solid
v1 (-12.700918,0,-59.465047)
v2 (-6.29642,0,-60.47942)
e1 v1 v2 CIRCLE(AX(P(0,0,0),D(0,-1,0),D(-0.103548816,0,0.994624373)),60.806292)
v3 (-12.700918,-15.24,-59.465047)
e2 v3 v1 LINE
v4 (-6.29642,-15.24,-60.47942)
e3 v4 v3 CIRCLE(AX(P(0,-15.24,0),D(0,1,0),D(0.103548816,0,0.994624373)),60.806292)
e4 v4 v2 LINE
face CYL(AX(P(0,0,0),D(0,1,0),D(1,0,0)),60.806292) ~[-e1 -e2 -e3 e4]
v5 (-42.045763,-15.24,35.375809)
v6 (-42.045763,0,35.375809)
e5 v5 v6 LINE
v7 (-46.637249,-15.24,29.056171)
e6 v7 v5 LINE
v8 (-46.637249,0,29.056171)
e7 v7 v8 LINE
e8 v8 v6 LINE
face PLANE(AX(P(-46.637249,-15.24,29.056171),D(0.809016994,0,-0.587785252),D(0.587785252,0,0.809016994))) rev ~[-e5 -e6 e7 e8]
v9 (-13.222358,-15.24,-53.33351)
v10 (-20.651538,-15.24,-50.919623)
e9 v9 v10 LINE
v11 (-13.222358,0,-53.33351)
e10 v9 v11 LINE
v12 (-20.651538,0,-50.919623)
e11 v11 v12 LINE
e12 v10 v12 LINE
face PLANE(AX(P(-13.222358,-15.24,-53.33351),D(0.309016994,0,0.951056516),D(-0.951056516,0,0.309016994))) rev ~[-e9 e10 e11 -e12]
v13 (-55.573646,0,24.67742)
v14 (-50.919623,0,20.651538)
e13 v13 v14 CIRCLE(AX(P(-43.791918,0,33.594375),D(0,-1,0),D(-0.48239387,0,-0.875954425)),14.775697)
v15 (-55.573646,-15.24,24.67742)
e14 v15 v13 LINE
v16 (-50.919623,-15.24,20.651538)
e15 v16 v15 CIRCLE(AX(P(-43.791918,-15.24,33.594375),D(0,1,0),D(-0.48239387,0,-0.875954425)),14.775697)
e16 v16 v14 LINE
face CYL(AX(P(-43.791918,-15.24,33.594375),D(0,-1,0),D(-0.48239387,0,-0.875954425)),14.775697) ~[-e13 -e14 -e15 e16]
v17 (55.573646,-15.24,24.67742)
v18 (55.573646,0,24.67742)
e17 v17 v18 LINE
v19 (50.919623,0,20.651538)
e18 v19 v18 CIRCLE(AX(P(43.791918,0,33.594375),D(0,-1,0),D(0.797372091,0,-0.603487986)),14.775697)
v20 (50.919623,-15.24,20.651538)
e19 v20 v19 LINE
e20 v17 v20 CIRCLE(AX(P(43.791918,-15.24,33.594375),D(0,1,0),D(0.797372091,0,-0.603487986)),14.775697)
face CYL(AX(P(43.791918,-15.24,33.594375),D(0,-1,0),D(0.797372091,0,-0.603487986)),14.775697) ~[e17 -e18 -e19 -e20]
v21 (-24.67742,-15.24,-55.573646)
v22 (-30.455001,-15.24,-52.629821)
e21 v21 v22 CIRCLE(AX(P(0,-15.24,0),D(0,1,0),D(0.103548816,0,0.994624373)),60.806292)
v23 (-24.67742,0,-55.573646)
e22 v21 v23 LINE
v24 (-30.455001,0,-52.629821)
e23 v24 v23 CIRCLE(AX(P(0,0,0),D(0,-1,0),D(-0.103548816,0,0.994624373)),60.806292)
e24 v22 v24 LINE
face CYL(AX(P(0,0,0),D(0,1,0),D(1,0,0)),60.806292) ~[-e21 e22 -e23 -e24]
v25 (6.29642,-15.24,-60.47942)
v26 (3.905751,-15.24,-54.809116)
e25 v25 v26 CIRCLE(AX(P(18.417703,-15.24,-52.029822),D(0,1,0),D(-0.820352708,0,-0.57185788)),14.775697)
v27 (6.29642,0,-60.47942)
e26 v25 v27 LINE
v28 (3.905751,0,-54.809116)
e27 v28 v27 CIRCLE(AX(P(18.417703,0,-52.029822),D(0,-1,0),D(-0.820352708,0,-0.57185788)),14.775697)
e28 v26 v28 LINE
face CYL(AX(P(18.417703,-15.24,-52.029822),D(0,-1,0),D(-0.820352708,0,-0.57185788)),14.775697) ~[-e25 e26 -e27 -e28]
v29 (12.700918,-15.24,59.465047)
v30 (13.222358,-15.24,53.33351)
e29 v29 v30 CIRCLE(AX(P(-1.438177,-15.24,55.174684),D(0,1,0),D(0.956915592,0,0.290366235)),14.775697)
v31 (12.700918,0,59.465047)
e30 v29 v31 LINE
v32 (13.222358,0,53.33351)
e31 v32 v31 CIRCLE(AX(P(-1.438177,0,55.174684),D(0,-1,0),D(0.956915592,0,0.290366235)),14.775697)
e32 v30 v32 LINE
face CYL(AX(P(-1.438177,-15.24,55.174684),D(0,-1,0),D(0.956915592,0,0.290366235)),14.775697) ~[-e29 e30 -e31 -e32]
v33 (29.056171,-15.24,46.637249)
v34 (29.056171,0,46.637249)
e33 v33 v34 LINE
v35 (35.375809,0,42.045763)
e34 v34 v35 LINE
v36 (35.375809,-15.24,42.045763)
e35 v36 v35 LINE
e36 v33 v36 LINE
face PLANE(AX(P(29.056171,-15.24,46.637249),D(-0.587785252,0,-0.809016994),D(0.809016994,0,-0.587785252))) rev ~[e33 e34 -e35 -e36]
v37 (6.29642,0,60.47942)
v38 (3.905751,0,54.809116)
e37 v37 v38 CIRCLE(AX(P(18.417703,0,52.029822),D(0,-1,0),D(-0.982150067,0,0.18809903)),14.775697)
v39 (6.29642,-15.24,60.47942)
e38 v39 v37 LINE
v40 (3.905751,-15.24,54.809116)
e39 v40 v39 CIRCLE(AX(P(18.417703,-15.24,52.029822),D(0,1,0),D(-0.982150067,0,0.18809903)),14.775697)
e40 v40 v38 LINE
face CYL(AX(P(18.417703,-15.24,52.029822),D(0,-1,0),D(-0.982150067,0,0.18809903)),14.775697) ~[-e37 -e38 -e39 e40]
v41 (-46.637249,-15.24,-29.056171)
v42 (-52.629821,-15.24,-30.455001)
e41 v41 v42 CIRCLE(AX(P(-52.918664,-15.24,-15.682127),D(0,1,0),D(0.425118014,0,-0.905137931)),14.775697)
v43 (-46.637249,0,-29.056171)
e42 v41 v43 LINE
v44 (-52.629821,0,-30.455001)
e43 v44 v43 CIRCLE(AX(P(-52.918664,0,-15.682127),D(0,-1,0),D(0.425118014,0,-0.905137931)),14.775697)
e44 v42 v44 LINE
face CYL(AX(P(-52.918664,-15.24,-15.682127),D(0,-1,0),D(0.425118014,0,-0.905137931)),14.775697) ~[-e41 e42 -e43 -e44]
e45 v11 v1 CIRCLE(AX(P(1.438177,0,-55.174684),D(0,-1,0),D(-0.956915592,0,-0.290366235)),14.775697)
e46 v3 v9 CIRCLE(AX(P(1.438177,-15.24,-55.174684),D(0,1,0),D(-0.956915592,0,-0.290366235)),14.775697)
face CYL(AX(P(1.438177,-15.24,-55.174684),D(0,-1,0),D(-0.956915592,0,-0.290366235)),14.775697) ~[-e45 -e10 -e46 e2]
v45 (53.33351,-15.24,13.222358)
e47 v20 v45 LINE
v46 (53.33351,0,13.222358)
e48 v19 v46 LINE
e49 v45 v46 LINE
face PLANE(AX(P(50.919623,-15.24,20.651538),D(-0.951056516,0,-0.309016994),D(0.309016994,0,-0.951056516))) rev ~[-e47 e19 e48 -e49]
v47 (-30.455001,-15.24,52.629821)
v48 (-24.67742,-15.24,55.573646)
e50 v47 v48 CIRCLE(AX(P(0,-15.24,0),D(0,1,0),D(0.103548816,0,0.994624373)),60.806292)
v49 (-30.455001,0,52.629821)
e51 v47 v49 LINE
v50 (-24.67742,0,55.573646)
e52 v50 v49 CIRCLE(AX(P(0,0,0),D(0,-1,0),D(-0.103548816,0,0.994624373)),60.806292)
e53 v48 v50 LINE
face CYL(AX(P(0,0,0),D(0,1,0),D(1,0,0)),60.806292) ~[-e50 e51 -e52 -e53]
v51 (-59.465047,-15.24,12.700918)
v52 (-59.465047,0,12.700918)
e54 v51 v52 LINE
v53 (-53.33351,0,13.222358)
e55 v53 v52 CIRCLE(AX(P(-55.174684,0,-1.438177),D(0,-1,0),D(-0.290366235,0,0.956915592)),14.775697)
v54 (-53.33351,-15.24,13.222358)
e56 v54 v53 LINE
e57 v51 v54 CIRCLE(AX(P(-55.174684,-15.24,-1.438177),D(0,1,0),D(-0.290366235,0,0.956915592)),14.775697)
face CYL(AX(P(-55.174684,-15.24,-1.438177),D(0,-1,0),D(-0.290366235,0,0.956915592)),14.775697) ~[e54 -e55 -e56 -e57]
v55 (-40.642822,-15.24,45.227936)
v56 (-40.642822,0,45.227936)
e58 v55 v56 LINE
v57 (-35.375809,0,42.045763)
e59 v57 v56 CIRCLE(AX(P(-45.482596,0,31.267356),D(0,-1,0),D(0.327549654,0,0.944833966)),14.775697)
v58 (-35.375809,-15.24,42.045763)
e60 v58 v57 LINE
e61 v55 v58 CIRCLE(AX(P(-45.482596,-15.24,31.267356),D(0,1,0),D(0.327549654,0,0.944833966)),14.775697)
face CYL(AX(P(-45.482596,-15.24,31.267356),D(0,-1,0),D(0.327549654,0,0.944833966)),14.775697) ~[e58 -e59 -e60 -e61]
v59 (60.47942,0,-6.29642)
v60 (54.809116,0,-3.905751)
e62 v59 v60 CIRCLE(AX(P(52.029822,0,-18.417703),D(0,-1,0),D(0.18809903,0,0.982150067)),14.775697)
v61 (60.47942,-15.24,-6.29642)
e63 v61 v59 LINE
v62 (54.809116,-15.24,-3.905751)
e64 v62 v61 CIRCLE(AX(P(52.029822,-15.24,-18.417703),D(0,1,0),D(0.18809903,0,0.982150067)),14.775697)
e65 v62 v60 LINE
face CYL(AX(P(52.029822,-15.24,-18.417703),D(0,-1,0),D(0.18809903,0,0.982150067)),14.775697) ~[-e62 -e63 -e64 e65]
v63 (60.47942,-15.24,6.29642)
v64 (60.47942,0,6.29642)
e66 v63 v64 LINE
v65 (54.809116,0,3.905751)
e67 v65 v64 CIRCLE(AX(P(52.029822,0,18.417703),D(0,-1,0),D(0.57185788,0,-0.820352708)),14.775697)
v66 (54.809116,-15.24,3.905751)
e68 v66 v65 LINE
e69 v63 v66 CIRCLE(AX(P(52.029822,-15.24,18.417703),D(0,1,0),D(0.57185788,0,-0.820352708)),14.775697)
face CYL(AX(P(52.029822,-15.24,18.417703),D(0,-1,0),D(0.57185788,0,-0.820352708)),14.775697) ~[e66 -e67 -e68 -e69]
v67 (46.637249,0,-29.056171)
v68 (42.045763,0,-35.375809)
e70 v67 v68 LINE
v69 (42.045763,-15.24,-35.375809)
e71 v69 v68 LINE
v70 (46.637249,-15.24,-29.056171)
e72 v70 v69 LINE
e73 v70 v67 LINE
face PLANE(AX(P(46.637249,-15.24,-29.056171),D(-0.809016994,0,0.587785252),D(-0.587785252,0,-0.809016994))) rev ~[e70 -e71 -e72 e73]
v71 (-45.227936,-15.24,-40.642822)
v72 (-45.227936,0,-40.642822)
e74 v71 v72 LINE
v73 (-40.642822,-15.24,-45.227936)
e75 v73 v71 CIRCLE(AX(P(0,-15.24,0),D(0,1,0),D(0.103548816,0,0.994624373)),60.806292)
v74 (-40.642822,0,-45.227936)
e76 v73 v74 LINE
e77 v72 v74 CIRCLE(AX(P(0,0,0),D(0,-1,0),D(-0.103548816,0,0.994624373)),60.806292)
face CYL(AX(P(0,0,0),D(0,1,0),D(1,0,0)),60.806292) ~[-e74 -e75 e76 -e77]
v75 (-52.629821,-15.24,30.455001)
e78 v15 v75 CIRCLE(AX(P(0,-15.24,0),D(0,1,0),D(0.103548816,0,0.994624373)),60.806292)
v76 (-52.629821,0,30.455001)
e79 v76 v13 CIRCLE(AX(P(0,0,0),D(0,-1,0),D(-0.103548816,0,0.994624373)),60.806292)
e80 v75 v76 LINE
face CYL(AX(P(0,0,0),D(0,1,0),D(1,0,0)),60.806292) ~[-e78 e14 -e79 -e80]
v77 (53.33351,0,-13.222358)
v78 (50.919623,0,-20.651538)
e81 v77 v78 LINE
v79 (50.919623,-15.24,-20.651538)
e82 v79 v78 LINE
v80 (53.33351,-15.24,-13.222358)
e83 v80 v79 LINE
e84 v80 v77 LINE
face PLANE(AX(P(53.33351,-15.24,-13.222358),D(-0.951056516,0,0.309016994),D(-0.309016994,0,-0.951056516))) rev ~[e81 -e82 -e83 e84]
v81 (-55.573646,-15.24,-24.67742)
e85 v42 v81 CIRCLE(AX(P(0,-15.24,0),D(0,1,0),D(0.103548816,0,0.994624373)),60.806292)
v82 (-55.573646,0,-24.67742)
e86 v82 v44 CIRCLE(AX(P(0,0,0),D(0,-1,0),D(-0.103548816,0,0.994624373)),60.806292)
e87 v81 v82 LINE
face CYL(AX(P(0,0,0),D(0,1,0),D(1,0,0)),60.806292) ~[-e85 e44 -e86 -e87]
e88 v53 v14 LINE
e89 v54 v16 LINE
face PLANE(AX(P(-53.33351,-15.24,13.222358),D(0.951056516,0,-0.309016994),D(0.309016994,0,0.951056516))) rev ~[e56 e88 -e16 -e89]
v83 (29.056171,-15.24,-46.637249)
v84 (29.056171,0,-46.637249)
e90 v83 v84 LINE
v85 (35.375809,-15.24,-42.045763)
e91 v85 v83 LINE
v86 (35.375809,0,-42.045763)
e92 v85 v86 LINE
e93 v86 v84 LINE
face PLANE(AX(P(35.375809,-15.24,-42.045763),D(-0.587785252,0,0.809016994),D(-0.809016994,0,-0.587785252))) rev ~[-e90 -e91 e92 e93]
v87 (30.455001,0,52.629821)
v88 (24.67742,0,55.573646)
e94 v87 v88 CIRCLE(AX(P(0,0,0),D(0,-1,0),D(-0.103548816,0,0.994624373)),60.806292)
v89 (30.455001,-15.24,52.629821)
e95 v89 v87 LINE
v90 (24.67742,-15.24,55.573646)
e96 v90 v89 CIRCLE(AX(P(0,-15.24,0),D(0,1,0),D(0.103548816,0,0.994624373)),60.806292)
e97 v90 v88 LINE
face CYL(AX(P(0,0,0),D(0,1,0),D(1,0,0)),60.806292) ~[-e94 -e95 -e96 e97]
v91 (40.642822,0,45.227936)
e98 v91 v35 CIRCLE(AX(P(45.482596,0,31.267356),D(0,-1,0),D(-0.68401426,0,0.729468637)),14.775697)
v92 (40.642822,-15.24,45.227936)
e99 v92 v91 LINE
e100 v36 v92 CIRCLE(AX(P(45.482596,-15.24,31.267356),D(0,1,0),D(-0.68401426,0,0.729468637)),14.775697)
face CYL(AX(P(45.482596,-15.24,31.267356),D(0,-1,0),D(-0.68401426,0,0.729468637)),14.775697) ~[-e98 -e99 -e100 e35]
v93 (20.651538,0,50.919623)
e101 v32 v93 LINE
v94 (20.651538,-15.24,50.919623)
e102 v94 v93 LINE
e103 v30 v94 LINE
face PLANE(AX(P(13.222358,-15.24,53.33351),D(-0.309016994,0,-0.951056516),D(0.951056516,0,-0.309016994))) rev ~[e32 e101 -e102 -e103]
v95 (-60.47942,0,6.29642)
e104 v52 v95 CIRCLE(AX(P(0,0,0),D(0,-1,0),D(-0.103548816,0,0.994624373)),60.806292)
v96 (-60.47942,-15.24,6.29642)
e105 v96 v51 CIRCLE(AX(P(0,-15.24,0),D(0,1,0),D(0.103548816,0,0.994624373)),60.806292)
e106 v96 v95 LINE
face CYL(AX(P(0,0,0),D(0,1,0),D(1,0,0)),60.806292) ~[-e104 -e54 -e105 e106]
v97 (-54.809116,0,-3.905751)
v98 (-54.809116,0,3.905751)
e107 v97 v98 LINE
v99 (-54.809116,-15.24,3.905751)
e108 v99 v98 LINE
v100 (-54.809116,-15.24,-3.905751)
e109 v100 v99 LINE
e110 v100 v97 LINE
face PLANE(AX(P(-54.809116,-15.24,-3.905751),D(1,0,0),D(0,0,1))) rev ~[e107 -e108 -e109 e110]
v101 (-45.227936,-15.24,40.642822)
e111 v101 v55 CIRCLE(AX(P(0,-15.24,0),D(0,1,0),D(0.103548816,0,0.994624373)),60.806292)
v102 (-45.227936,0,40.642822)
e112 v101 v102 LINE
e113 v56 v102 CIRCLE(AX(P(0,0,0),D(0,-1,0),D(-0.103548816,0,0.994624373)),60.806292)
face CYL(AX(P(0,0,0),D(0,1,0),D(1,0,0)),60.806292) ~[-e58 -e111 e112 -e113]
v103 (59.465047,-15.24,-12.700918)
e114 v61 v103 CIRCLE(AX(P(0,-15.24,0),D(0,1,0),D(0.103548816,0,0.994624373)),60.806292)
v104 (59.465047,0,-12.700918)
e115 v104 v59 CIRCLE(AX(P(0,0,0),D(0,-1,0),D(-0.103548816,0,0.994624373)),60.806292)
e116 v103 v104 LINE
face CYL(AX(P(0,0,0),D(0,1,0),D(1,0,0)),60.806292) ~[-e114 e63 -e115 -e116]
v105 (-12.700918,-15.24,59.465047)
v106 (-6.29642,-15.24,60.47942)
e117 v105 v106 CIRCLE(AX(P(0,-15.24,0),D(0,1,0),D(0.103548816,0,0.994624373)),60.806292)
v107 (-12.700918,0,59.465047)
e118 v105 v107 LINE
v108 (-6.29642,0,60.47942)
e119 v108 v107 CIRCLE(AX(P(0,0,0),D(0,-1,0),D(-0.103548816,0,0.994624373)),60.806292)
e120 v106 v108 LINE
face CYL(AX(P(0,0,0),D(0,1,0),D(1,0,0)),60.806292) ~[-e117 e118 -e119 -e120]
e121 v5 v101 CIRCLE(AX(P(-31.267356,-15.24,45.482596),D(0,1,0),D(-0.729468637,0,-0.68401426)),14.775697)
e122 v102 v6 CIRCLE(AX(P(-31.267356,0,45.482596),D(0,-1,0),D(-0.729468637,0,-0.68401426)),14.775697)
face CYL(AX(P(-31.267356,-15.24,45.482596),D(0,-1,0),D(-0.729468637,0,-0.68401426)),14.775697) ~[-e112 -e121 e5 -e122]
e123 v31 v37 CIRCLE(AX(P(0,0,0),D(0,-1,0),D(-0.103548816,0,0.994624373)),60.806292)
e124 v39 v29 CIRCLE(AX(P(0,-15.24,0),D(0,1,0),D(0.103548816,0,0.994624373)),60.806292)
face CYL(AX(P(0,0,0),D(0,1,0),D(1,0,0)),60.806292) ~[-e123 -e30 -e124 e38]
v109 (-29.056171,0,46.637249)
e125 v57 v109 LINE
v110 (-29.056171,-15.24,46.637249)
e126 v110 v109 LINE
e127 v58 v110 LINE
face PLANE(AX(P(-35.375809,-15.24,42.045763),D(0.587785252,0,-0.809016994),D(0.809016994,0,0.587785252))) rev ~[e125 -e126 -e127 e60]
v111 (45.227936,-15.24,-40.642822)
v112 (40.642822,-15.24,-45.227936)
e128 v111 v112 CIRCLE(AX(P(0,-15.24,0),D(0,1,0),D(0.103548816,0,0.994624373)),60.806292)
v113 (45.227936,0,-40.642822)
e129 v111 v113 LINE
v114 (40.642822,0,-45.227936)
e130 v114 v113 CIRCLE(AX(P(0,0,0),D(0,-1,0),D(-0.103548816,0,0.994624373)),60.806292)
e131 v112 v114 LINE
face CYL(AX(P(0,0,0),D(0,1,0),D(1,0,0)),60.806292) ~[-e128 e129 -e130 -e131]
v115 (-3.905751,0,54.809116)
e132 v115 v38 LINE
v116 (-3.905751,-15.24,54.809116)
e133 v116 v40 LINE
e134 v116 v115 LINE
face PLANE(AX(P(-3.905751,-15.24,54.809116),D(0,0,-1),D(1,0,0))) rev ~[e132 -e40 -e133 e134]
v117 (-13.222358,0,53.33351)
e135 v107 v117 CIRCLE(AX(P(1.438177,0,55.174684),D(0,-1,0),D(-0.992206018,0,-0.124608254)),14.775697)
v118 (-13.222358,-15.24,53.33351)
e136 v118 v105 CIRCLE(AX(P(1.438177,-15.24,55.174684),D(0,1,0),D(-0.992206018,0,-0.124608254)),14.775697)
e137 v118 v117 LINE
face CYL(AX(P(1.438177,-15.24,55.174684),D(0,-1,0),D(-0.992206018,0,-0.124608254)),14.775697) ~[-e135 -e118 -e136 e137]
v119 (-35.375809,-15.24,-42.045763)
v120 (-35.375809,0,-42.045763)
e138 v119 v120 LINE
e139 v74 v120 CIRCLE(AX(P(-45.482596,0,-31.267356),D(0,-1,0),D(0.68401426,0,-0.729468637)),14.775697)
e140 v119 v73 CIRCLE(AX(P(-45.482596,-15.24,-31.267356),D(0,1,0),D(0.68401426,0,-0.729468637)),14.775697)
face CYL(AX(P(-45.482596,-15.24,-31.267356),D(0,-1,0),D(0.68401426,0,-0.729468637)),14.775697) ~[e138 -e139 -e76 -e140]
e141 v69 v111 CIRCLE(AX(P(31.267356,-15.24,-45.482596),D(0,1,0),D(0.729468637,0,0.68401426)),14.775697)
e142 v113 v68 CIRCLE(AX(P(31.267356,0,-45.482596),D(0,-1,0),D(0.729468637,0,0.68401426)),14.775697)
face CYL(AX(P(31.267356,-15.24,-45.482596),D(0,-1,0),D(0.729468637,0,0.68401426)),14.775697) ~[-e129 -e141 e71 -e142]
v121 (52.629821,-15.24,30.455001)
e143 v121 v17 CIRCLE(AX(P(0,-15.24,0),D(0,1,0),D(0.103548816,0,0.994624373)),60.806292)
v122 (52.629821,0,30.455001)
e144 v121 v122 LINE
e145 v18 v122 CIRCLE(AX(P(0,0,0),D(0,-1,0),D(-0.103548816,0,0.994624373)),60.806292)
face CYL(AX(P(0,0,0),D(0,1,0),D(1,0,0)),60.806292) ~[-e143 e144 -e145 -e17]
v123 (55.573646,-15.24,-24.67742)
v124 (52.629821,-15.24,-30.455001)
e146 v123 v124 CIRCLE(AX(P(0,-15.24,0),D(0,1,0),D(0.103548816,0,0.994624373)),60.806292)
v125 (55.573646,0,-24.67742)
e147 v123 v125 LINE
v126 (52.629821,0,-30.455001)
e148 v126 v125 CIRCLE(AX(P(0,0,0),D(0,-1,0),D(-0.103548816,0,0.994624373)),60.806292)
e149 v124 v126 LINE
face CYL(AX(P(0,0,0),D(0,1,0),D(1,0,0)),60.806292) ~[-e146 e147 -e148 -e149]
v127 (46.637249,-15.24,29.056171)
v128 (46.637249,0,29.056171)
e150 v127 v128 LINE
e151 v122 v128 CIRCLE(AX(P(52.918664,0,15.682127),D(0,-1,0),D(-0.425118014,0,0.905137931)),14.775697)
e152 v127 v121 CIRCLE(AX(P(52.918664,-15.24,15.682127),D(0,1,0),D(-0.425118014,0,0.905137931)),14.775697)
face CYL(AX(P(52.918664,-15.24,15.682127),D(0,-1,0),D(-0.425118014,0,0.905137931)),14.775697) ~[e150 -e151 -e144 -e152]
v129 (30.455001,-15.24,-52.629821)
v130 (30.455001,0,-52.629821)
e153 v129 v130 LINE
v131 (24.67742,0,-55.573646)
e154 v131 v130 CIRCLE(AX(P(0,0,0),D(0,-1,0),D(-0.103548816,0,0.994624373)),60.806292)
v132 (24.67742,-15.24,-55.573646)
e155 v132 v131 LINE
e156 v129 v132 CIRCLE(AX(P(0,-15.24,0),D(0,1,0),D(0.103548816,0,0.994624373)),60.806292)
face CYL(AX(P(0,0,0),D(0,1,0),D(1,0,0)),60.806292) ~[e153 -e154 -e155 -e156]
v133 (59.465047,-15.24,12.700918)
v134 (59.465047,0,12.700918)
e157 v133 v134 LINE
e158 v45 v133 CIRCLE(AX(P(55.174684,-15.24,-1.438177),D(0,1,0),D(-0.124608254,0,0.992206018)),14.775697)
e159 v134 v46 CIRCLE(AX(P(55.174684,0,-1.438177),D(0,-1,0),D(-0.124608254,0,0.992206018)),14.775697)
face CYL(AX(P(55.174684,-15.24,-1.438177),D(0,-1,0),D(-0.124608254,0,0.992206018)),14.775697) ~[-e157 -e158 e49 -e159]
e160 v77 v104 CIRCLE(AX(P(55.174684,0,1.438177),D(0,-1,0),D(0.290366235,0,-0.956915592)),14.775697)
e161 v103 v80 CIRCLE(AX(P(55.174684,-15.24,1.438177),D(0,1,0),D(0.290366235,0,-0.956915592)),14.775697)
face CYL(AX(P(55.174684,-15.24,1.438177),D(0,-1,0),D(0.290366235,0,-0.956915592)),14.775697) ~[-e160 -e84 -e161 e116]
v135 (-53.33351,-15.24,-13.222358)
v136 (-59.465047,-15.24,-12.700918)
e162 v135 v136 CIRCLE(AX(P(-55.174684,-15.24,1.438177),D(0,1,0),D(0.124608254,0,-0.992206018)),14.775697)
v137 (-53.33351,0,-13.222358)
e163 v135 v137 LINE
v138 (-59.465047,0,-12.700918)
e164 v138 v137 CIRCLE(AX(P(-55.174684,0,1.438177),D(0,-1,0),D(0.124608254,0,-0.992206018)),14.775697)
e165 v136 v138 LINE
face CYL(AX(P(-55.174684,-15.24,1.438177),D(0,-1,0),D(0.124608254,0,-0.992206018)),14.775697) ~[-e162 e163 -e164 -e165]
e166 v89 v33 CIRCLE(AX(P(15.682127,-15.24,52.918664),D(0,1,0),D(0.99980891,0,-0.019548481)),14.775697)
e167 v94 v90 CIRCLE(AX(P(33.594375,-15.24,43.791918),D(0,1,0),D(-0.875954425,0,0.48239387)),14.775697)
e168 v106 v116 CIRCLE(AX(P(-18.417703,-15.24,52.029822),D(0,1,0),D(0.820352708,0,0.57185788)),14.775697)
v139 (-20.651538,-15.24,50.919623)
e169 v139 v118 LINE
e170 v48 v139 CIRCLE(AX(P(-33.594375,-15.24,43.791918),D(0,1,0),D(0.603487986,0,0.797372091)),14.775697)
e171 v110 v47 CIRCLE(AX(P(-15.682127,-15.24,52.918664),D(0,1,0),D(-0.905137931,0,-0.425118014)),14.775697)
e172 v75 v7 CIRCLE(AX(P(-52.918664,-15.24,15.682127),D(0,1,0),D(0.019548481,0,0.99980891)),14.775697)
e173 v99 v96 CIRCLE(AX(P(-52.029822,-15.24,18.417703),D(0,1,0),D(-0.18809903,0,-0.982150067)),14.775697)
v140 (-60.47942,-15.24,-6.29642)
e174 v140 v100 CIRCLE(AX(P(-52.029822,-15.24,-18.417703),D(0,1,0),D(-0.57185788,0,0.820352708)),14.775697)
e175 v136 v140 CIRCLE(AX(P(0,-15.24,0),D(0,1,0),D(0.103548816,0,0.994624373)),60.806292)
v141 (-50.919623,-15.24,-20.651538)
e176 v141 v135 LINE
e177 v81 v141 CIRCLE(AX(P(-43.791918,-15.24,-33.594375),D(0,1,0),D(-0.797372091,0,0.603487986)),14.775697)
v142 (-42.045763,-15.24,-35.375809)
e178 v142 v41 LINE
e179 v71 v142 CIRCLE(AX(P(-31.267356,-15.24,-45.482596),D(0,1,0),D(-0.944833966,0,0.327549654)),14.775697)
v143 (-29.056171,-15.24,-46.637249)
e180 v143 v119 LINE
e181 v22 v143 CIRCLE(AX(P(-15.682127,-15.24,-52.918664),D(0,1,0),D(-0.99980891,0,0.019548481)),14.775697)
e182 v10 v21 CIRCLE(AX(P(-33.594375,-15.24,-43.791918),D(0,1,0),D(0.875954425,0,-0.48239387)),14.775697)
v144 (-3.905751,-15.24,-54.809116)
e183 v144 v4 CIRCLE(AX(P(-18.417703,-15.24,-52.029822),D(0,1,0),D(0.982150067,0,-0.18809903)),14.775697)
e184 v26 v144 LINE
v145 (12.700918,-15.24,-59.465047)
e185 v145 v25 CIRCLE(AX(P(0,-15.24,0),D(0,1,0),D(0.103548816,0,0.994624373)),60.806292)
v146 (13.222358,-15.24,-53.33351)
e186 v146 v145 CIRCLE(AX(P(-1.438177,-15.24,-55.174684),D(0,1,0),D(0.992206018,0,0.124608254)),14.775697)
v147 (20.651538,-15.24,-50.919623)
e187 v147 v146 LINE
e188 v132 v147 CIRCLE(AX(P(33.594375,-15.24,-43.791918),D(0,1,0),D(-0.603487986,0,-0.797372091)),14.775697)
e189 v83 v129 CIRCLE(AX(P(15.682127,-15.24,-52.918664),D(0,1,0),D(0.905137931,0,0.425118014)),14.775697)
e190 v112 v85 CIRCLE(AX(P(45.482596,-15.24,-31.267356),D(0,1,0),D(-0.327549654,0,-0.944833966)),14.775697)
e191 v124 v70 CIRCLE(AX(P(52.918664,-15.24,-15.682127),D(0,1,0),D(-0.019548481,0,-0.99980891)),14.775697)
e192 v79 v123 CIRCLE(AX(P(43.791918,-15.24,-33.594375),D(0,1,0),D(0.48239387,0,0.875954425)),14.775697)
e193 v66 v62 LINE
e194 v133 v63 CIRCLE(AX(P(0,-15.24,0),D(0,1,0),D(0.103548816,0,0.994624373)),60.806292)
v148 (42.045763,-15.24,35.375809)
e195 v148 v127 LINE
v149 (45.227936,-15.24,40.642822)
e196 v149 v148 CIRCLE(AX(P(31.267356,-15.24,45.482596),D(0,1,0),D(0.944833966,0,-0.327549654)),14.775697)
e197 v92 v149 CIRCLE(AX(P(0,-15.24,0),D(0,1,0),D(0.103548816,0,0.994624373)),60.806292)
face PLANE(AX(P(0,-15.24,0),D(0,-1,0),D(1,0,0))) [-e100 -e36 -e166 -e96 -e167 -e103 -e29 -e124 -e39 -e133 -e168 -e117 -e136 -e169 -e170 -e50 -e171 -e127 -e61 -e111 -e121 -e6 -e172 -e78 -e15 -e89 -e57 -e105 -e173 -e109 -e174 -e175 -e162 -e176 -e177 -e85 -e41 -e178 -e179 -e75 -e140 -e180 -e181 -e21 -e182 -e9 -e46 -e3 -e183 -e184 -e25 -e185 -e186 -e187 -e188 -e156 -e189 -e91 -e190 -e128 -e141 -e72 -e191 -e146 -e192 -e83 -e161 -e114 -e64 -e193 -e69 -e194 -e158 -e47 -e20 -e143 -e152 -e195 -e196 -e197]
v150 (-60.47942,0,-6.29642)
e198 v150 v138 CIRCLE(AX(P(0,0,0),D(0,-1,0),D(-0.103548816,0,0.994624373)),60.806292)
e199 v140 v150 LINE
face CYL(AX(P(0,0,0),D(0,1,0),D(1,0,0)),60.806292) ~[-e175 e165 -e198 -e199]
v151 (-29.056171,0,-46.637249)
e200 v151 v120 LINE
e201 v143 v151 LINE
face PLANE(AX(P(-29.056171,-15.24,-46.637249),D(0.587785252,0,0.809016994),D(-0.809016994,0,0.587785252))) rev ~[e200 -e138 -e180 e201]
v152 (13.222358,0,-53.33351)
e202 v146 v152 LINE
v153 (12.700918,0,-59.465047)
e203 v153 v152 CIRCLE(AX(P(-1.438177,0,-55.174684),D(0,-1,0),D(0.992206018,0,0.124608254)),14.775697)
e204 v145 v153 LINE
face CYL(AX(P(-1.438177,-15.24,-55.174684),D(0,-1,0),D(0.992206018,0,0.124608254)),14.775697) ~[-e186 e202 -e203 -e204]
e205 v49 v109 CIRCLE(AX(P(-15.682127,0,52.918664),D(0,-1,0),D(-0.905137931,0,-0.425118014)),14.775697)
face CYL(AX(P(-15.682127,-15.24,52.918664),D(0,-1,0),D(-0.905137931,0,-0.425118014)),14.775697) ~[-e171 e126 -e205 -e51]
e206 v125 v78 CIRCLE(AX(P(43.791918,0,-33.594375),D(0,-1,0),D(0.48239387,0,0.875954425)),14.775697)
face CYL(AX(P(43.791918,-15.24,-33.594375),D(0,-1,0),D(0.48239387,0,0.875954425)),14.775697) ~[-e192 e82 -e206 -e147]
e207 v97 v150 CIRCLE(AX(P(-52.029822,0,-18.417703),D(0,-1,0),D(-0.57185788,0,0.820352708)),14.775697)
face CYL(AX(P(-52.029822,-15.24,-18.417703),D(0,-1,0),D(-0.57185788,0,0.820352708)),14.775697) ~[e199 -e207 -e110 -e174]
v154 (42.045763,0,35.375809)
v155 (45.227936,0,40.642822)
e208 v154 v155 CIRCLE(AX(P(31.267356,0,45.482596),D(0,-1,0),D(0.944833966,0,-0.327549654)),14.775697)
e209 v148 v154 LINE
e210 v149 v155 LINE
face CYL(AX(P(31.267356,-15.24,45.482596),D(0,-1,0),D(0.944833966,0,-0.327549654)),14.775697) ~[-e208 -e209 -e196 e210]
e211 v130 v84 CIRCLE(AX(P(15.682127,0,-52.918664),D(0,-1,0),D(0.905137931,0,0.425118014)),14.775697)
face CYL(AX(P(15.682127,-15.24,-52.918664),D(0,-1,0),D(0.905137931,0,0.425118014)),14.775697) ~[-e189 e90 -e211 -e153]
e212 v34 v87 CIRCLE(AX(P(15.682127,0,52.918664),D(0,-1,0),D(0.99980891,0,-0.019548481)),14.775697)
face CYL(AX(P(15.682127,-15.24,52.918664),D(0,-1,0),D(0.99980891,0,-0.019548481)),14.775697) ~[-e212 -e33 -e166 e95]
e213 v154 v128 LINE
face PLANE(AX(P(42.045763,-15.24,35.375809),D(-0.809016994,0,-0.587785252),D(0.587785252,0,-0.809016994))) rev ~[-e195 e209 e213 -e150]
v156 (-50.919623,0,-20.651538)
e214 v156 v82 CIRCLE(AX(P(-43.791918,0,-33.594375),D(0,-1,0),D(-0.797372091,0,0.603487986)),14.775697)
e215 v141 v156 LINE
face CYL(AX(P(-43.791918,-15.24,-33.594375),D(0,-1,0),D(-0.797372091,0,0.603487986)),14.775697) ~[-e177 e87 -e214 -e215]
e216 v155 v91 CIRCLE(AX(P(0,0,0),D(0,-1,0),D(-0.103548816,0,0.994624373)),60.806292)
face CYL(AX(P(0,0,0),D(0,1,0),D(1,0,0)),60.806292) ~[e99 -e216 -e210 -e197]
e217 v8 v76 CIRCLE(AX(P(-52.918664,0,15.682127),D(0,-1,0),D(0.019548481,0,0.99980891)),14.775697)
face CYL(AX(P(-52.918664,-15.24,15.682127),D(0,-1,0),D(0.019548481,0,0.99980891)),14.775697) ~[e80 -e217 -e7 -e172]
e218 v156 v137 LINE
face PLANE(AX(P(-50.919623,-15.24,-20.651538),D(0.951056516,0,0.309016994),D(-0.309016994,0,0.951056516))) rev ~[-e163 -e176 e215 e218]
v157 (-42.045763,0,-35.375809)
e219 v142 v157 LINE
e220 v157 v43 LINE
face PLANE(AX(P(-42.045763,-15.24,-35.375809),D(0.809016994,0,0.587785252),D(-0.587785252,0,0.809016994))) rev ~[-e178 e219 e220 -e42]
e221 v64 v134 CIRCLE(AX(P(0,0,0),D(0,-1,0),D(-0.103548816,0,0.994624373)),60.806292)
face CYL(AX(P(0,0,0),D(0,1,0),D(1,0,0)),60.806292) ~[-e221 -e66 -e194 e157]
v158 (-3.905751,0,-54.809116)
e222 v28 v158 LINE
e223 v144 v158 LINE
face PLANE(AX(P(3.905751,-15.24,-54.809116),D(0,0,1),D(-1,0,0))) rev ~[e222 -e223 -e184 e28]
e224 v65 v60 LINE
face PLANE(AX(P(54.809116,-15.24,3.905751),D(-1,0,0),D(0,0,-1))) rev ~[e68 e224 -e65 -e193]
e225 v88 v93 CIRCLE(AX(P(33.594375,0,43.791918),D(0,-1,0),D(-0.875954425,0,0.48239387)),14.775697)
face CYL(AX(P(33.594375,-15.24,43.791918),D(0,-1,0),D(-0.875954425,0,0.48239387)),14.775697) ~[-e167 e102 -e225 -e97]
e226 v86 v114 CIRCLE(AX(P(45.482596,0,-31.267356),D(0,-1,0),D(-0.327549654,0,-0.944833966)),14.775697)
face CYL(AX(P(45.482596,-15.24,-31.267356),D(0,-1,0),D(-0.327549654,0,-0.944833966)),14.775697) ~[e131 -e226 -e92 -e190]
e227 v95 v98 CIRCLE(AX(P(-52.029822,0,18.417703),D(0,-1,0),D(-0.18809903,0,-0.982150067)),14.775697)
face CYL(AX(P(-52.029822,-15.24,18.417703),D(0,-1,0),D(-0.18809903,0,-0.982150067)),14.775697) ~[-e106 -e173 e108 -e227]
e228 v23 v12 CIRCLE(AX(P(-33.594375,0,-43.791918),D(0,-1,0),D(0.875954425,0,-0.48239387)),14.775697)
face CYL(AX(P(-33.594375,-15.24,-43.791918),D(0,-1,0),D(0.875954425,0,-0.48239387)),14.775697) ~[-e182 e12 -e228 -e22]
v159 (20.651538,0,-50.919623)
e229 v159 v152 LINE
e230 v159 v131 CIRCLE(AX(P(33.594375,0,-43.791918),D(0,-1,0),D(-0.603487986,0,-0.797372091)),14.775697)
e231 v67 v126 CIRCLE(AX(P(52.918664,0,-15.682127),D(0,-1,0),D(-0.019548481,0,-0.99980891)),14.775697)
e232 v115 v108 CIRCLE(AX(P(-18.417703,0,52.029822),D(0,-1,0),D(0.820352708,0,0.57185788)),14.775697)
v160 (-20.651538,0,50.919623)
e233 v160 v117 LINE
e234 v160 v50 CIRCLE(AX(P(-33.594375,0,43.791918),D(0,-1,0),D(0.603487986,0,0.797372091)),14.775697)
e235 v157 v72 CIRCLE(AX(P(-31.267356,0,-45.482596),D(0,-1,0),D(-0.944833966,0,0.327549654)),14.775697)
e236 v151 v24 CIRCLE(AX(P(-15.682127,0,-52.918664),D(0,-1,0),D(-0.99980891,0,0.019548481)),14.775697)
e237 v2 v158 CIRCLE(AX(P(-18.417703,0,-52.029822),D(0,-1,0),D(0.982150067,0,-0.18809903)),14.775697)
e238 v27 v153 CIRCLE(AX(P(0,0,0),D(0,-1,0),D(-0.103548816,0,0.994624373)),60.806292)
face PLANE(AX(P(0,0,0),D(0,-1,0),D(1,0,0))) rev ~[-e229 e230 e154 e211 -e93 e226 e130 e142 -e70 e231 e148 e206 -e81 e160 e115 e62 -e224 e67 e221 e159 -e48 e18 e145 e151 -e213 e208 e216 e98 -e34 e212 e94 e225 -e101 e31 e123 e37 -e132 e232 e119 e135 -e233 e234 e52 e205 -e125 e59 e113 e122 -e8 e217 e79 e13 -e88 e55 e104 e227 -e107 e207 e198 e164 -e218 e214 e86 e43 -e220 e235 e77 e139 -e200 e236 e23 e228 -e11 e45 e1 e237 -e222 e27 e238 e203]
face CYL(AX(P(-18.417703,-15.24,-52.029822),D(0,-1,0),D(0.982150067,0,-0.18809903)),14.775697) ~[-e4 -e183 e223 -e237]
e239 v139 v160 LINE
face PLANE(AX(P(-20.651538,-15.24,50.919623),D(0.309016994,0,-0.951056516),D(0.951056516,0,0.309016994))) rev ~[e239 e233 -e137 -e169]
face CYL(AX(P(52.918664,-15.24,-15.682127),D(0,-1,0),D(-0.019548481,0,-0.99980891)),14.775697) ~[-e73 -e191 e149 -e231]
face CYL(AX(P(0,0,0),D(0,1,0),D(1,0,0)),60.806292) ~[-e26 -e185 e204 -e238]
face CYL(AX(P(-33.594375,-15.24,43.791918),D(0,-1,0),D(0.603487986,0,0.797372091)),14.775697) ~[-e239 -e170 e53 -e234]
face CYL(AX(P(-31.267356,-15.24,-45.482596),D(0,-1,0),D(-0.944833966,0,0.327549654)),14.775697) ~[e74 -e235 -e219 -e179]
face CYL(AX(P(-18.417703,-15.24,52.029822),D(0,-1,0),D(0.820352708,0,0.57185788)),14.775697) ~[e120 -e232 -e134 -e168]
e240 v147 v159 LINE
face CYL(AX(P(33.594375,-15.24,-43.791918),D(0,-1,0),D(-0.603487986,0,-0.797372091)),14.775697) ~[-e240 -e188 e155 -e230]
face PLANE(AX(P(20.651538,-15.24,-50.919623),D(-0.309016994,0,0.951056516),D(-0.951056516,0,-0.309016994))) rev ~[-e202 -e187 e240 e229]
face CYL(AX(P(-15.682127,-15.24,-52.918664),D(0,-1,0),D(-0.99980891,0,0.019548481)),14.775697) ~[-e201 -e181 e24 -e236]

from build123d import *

# Parameters (mm, degrees)
F0_R            = 60.8062922789
F1_DEPTH        = 15.24
F3_DEPTH        = 15.241
F3_COPIES_COUNT = 20


# Not quite as in the source:
# - a pattern or mirror of a feature is missing from the dataset's text; its kind, count and spacing are read off the source's solid


with BuildPart() as f1:
    # F0 (on Front) → F1 (new body)
    with BuildSketch(Plane.XZ):
        Circle(F0_R)
    extrude(amount=F1_DEPTH)

    # F2 (on face) → F3 (cut, through all)
    with BuildSketch(Plane.XZ.offset(15.24)):
        with BuildLine():
            ThreePointArc((-10.0692585111, 64.2209947109), (-8.0132671596, 62.5211963323), (-6.2964195687, 60.4794203124))
            ThreePointArc((-6.2964195687, 60.4794203124), (0, 60.8062922789), (6.2964195687, 60.4794203124))
            ThreePointArc((6.2964195687, 60.4794203124), (8.0132671596, 62.5211963323), (10.0692585111, 64.2209947109))
            Line((10.0692585111, 64.2209947109), (-10.0692585111, 64.2209947109))
        make_face()
        with BuildLine():
            ThreePointArc((-6.2964195687, 60.4794203124), (-4.802623185, 57.7701032506), (-3.9057508111, 54.8091158271))
            Line((-3.9057508111, 54.8091158271), (0, 54.8091158271))
            Line((0, 54.8091158271), (3.9057508111, 54.8091158271))
            ThreePointArc((3.9057508111, 54.8091158271), (4.802623185, 57.7701032506), (6.2964195687, 60.4794203124))
            ThreePointArc((6.2964195687, 60.4794203124), (0, 60.8062922789), (-6.2964195687, 60.4794203124))
        make_face()
    f3 = extrude(amount=-F3_DEPTH, mode=Mode.SUBTRACT)

    # F3_copies: F3 ×20 about axis
    f3_copies_axis = Axis((0, 0, 0), (0, 1, 0))
    for i in range(1, F3_COPIES_COUNT):
        add(f3.rotate(f3_copies_axis, i * 360 / F3_COPIES_COUNT), mode=Mode.SUBTRACT)


solid = f1.part
